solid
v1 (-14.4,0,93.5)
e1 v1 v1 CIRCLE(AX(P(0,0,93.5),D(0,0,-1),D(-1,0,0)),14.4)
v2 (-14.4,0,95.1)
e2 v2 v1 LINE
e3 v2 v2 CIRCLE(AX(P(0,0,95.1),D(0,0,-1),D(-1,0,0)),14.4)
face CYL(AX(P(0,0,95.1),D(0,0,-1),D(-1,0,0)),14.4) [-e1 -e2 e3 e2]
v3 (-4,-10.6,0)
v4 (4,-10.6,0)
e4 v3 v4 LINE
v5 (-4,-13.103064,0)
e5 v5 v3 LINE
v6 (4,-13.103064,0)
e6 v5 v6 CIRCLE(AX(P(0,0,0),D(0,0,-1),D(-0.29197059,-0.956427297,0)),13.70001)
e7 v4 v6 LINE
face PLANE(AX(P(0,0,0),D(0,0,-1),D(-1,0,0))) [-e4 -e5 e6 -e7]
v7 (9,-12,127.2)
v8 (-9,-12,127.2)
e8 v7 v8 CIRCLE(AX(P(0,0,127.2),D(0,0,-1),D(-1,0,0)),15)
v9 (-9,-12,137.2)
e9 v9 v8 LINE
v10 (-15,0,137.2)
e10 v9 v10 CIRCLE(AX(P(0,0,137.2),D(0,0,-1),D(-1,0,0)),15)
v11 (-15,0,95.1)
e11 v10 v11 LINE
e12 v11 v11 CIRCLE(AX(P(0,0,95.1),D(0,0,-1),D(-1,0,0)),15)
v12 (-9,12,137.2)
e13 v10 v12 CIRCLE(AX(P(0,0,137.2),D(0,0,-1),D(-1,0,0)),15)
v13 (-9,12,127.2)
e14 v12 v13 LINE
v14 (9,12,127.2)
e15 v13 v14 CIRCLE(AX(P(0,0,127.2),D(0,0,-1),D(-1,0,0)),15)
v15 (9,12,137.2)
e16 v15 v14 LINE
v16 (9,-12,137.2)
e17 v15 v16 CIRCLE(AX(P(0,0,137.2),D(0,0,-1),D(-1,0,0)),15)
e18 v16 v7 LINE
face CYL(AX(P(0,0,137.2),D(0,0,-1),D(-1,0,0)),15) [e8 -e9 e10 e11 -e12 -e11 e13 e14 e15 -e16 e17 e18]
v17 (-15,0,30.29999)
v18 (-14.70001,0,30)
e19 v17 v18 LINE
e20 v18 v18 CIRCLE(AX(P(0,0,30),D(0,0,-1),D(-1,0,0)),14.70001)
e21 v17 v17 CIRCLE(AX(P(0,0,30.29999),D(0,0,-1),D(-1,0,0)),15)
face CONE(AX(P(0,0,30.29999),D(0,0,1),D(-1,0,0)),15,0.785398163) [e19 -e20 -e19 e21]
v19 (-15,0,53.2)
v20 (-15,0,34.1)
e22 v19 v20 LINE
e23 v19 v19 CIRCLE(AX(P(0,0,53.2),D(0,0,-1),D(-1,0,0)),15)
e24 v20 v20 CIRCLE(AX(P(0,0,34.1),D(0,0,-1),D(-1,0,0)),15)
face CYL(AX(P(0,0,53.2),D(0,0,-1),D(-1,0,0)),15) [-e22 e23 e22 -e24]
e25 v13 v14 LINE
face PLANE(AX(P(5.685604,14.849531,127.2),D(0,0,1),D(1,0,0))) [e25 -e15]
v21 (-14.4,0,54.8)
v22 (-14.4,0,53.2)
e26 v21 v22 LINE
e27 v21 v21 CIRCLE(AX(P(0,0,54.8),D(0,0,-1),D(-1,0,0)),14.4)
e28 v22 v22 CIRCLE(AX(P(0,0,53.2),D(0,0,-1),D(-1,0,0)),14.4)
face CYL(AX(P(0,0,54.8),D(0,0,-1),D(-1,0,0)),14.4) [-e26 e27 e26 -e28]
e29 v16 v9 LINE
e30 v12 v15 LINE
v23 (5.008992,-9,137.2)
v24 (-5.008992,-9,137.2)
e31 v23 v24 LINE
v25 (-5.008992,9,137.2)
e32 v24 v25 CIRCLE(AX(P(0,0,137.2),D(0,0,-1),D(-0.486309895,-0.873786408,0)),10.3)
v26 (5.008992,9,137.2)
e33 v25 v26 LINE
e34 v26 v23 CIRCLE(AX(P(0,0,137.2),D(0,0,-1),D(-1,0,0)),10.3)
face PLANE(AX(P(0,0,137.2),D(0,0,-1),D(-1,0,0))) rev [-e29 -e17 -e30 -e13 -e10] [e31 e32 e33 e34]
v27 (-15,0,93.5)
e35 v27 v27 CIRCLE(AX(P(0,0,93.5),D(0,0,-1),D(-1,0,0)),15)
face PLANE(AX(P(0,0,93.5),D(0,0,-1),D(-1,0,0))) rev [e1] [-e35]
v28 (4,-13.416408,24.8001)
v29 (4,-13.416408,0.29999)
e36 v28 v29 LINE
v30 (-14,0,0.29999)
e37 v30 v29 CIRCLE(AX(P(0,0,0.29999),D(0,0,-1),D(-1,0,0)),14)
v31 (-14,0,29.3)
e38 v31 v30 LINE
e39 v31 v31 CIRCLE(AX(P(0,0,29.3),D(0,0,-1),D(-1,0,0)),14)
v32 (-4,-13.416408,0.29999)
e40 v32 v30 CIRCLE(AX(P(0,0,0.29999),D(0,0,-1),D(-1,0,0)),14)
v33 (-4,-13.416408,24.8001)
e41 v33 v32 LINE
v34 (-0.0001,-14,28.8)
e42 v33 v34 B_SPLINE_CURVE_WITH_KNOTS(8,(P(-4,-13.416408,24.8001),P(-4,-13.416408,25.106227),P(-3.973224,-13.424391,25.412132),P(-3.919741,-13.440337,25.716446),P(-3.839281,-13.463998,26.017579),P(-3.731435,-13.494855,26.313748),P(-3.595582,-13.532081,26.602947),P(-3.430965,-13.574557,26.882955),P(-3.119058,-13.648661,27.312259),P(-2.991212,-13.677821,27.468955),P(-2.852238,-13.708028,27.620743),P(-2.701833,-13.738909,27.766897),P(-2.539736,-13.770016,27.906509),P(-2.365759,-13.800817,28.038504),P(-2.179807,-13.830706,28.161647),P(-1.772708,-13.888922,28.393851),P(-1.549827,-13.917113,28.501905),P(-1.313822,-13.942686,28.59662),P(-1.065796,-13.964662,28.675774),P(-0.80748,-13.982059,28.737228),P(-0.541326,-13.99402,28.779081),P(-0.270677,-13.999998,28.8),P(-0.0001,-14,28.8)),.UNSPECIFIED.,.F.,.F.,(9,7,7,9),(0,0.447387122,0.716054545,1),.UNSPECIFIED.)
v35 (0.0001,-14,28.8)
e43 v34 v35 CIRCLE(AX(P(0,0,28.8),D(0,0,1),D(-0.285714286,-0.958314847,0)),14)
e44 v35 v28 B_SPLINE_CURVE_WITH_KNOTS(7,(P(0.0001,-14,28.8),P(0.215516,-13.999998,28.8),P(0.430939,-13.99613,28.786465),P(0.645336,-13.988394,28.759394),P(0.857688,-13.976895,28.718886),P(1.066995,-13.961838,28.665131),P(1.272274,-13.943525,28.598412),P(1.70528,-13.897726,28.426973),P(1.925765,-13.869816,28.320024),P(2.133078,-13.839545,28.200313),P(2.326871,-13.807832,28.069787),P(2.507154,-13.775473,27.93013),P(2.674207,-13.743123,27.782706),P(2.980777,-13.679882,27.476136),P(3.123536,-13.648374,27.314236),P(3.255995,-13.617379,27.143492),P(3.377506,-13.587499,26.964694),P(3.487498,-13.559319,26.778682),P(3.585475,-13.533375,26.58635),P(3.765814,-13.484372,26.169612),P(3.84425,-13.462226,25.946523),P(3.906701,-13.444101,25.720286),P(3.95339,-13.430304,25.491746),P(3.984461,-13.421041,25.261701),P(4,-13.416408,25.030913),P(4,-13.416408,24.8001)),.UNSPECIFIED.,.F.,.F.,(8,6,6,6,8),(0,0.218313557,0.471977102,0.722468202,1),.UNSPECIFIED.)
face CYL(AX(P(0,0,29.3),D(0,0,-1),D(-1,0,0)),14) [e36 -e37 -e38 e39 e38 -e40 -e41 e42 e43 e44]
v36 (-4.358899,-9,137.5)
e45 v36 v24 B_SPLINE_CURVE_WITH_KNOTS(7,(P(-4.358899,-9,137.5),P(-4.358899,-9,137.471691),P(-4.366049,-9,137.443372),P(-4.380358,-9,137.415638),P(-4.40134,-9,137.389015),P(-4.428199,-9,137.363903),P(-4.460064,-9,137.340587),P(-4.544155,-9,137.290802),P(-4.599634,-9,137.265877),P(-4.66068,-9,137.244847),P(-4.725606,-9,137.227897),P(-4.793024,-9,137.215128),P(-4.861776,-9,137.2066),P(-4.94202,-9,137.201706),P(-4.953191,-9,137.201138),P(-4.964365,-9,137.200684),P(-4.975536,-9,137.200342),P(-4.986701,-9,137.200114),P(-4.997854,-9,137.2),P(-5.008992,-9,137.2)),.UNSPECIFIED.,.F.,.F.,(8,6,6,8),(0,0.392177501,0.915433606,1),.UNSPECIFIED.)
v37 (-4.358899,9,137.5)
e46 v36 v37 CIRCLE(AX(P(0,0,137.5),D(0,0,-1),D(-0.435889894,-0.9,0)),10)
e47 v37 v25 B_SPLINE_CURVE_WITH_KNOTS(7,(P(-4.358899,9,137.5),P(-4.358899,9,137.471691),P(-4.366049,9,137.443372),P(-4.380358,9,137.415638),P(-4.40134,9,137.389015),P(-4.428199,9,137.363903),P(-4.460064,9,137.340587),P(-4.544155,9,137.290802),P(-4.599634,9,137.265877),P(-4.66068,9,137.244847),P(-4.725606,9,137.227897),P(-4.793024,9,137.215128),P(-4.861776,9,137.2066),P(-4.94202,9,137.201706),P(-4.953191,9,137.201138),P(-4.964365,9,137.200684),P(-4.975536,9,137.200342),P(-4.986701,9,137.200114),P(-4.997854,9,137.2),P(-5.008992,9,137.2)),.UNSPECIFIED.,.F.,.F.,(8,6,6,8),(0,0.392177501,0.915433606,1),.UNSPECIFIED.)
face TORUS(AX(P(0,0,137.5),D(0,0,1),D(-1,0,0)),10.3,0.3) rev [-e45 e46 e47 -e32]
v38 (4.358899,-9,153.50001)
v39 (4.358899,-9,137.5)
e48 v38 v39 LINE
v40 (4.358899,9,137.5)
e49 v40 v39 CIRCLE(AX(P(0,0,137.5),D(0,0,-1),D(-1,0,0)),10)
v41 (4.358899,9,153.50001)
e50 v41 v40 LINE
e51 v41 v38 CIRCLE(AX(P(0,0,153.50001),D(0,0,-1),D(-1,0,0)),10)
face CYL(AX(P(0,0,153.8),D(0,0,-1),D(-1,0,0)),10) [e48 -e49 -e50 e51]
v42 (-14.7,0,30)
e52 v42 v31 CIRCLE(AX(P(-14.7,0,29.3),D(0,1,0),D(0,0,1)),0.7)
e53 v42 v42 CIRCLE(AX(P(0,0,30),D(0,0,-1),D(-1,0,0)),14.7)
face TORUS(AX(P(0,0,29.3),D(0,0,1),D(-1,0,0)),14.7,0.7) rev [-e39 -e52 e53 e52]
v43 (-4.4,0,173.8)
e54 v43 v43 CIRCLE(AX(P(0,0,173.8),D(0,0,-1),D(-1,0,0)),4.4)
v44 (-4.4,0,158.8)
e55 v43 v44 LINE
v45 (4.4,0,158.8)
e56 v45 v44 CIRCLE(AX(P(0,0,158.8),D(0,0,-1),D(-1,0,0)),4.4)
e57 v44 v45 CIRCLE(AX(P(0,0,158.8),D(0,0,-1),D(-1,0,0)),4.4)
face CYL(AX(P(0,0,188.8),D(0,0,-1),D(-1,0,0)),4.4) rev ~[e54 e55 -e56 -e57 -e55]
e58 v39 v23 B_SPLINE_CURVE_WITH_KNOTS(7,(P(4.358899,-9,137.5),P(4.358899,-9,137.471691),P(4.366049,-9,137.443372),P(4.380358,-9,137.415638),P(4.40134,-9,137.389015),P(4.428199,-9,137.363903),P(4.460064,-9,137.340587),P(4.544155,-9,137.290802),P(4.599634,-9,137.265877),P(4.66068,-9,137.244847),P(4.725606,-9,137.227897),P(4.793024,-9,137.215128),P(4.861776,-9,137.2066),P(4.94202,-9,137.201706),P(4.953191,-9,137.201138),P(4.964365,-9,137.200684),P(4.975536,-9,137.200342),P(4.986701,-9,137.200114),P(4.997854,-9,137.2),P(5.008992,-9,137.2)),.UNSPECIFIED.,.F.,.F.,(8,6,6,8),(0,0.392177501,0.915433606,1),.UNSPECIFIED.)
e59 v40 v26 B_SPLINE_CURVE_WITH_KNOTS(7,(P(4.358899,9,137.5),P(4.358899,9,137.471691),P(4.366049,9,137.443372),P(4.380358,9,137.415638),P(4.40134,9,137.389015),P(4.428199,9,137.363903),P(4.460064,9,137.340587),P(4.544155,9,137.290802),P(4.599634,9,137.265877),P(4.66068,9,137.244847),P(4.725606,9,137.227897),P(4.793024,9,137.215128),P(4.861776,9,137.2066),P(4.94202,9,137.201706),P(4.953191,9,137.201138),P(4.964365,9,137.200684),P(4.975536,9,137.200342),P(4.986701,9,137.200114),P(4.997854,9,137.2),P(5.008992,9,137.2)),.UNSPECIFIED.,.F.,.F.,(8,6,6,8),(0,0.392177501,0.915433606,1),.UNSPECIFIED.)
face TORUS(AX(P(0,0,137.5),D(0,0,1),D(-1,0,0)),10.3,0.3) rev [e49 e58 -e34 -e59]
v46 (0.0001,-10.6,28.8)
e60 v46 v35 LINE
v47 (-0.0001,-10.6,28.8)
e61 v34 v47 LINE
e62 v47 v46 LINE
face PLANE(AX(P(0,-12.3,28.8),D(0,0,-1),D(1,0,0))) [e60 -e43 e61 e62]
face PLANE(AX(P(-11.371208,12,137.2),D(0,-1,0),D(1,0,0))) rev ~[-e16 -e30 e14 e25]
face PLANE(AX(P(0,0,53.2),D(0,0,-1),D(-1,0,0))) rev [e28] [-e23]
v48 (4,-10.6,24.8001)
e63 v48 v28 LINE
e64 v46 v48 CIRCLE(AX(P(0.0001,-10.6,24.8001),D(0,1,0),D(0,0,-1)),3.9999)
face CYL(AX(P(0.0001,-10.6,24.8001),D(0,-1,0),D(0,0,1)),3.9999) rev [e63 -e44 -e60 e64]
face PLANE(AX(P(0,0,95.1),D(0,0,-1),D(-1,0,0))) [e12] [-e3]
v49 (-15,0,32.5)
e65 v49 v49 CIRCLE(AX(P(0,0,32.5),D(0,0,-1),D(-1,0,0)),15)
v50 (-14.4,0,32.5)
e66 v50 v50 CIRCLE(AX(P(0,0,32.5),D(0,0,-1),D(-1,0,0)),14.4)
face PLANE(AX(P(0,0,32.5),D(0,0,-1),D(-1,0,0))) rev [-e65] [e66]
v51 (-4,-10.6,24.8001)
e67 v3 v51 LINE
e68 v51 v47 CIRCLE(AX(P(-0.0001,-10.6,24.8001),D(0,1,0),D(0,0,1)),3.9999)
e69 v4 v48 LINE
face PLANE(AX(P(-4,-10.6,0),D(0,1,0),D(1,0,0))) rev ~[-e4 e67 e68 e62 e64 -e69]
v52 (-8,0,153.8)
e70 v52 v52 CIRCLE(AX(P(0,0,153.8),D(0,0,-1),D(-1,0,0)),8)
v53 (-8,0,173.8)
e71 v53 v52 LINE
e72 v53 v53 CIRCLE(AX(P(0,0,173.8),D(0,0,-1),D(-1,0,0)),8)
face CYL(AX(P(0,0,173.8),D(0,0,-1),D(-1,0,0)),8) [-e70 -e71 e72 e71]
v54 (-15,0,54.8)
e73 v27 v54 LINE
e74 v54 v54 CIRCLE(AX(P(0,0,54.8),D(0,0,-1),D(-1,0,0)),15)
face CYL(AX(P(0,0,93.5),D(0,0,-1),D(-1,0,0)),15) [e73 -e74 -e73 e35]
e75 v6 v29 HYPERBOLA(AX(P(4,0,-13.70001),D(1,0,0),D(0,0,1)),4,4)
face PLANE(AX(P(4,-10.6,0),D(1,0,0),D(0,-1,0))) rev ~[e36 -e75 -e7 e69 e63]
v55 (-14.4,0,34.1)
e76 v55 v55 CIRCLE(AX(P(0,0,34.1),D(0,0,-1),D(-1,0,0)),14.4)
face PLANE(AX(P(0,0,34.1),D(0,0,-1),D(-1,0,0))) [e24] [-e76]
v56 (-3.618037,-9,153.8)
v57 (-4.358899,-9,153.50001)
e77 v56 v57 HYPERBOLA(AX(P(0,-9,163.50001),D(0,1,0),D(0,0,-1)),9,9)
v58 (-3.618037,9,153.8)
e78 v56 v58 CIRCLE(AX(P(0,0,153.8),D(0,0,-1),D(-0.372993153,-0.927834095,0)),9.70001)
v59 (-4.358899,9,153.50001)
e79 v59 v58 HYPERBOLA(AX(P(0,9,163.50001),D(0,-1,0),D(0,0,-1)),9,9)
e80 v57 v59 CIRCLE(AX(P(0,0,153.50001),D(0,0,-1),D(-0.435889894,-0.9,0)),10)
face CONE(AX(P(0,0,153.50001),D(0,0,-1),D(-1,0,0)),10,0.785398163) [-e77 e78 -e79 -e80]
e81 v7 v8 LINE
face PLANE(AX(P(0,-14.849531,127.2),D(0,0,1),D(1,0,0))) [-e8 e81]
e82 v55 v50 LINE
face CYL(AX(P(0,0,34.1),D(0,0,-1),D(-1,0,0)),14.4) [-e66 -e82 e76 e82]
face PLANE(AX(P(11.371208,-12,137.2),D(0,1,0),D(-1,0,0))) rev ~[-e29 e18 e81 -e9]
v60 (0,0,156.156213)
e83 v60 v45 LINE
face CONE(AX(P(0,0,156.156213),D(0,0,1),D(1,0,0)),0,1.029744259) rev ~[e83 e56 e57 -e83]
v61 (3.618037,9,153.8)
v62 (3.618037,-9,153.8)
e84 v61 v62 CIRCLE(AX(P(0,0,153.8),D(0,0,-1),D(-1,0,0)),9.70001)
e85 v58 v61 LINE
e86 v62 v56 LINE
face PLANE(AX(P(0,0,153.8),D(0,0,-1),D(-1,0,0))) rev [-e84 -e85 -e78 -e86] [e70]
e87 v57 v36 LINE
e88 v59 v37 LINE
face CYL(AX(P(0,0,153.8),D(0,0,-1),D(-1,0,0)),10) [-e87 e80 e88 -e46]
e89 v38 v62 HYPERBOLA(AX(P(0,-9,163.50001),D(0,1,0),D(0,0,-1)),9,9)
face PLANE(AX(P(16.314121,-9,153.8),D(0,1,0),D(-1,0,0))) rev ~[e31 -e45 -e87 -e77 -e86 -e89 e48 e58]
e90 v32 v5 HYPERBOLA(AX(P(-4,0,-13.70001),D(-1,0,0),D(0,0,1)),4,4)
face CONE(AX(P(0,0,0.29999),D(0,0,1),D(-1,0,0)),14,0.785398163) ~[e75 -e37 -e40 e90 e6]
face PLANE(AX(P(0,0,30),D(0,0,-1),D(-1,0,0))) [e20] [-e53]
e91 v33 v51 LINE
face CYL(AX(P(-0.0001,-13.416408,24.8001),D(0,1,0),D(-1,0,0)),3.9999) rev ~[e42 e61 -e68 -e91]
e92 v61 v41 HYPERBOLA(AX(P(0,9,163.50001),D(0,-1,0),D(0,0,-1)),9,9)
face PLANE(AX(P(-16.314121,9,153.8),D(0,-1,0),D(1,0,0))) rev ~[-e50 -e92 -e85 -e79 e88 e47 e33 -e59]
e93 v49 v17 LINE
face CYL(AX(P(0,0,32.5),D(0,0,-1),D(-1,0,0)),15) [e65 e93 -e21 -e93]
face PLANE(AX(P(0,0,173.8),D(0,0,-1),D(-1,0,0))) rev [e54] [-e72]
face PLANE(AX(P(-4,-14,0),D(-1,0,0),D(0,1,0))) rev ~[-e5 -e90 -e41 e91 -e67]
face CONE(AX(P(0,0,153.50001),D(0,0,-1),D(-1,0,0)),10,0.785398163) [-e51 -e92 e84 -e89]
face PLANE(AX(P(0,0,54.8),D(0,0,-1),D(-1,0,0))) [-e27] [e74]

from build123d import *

# Parameters (mm, degrees)
F2_SIZE   = 0.29999
F4_DEPTH  = 28.8
F5_R      = 3.9999
F6_W      = 16.3141209632
F6_H      = 1.5053940788
F7_DEPTH  = 16.6
F8_W      = 11.3712083548
F8_H      = 5.6990628242
F9_DEPTH  = 10
F11_D     = 8.8
F11_DEPTH = 15
F11_TIP   = 2.6437867237


# Not quite as in the source:
# - a fillet or chamfer is up to 0.001 mm smaller than in the source, because OpenCascade refuses the exact size


with BuildPart() as f1:
    # F0 (on Front) → F1 (revolve)
    with BuildSketch(Plane.XZ):
        with BuildLine():
            Line((-14, 0), (0, 0))
            Line((0, 0), (0, 173.8))
            Line((0, 173.8), (-8, 173.8))
            Line((-8, 173.8), (-8, 153.8))
            Line((-8, 153.8), (-10, 153.8))
            Line((-10, 153.8), (-10, 137.5))
            ThreePointArc((-10, 137.5), (-10.0878679656, 137.2878679656), (-10.3, 137.2))
            Line((-10.3, 137.2), (-15, 137.2))
            Line((-15, 137.2), (-15, 137))
            Line((-15, 137), (-15, 136.8790119886))
            Line((-15, 136.8790119886), (-15, 95.1))
            Line((-15, 95.1), (-14.4, 95.1))
            Line((-14.4, 95.1), (-14.4, 93.5))
            Line((-14.4, 93.5), (-15, 93.5))
            Line((-15, 93.5), (-15, 54.8))
            Line((-15, 54.8), (-14.4, 54.8))
            Line((-14.4, 54.8), (-14.4, 53.2))
            Line((-14.4, 53.2), (-15, 53.2))
            Line((-15, 53.2), (-15, 34.1))
            Line((-15, 34.1), (-14.4, 34.1))
            Line((-14.4, 34.1), (-14.4, 32.5))
            Line((-14.4, 32.5), (-15, 32.5))
            Line((-15, 32.5), (-15, 30))
            Line((-15, 30), (-14.7, 30))
            ThreePointArc((-14.7, 30), (-14.2050252532, 29.7949747468), (-14, 29.3))
            Line((-14, 29.3), (-14, 0))
        make_face()
    revolve(axis=Axis((0, 0, 86.9), (0, 0, -1)))

    # F2 (size 0.3 in the source; OpenCascade refuses exactly that, so slightly less here)
    f2_edges = [f1.edges().sort_by_distance(p)[0] for p in [
        (15, 0, 30),
        (10, 0, 153.8),
        (14, 0, 0),
    ]]
    chamfer(f2_edges, length=F2_SIZE)

    # F3 (on face) → F4 (cut)
    with BuildSketch(Plane(origin=(0, 0, 0), x_dir=(1, 0, 0), z_dir=(0, 0, -1))):
        Polygon((4, 14), (0, 14), (-4, 14), (-4, 10.6), (0, 10.6), (4, 10.6), align=None)
    extrude(amount=-F4_DEPTH, mode=Mode.SUBTRACT)

    # F5 (radius 4 in the source; OpenCascade refuses exactly that, so slightly less here)
    f5_edges = [f1.edges().sort_by_distance(p)[0] for p in [
        (4, -12.008204, 28.8),
        (-4, -12.008204, 28.8),
    ]]
    fillet(f5_edges, radius=F5_R)

    # F6 (on face) → F7 (cut, through all)
    with BuildSketch(Plane.XY.offset(153.8)):
        with Locations((-8.1570604816, -9.7526970394)):
            Rectangle(F6_W, F6_H)
        with Locations((8.1570604816, -9.7526970394)):
            Rectangle(F6_W, F6_H)
        Polygon((-16.3141209632, 9), (0, 9), (16.3141209632, 9), (16.3141209632, 10.5053940788), (0, 10.5053940788), (-16.3141209632, 10.5053940788), align=None)
    extrude(amount=-F7_DEPTH, mode=Mode.SUBTRACT)

    # F8 (on face) → F9 (cut)
    with BuildSketch(Plane.XY.offset(137.2)):
        with Locations((5.6856041774, 14.8495314121)):
            Rectangle(F8_W, F8_H)
        with Locations((-5.6856041774, 14.8495314121)):
            Rectangle(F8_W, F8_H)
        Polygon((0, -17.6990628242), (11.3712083548, -17.6990628242), (11.3712083548, -12), (0, -12), (-11.3712083548, -12), (-11.3712083548, -17.6990628242), align=None)
    extrude(amount=-F9_DEPTH, mode=Mode.SUBTRACT)

    # F11
    with Locations(Plane.XY.offset(173.8)):
        with Locations((0, 0)):
            Hole(F11_D / 2, depth=F11_DEPTH)
            with Locations((0, 0, -(F11_DEPTH + F11_TIP / 2))):  # 118° drill point
                Cone(0, F11_D / 2, F11_TIP, mode=Mode.SUBTRACT)


solid = f1.part
